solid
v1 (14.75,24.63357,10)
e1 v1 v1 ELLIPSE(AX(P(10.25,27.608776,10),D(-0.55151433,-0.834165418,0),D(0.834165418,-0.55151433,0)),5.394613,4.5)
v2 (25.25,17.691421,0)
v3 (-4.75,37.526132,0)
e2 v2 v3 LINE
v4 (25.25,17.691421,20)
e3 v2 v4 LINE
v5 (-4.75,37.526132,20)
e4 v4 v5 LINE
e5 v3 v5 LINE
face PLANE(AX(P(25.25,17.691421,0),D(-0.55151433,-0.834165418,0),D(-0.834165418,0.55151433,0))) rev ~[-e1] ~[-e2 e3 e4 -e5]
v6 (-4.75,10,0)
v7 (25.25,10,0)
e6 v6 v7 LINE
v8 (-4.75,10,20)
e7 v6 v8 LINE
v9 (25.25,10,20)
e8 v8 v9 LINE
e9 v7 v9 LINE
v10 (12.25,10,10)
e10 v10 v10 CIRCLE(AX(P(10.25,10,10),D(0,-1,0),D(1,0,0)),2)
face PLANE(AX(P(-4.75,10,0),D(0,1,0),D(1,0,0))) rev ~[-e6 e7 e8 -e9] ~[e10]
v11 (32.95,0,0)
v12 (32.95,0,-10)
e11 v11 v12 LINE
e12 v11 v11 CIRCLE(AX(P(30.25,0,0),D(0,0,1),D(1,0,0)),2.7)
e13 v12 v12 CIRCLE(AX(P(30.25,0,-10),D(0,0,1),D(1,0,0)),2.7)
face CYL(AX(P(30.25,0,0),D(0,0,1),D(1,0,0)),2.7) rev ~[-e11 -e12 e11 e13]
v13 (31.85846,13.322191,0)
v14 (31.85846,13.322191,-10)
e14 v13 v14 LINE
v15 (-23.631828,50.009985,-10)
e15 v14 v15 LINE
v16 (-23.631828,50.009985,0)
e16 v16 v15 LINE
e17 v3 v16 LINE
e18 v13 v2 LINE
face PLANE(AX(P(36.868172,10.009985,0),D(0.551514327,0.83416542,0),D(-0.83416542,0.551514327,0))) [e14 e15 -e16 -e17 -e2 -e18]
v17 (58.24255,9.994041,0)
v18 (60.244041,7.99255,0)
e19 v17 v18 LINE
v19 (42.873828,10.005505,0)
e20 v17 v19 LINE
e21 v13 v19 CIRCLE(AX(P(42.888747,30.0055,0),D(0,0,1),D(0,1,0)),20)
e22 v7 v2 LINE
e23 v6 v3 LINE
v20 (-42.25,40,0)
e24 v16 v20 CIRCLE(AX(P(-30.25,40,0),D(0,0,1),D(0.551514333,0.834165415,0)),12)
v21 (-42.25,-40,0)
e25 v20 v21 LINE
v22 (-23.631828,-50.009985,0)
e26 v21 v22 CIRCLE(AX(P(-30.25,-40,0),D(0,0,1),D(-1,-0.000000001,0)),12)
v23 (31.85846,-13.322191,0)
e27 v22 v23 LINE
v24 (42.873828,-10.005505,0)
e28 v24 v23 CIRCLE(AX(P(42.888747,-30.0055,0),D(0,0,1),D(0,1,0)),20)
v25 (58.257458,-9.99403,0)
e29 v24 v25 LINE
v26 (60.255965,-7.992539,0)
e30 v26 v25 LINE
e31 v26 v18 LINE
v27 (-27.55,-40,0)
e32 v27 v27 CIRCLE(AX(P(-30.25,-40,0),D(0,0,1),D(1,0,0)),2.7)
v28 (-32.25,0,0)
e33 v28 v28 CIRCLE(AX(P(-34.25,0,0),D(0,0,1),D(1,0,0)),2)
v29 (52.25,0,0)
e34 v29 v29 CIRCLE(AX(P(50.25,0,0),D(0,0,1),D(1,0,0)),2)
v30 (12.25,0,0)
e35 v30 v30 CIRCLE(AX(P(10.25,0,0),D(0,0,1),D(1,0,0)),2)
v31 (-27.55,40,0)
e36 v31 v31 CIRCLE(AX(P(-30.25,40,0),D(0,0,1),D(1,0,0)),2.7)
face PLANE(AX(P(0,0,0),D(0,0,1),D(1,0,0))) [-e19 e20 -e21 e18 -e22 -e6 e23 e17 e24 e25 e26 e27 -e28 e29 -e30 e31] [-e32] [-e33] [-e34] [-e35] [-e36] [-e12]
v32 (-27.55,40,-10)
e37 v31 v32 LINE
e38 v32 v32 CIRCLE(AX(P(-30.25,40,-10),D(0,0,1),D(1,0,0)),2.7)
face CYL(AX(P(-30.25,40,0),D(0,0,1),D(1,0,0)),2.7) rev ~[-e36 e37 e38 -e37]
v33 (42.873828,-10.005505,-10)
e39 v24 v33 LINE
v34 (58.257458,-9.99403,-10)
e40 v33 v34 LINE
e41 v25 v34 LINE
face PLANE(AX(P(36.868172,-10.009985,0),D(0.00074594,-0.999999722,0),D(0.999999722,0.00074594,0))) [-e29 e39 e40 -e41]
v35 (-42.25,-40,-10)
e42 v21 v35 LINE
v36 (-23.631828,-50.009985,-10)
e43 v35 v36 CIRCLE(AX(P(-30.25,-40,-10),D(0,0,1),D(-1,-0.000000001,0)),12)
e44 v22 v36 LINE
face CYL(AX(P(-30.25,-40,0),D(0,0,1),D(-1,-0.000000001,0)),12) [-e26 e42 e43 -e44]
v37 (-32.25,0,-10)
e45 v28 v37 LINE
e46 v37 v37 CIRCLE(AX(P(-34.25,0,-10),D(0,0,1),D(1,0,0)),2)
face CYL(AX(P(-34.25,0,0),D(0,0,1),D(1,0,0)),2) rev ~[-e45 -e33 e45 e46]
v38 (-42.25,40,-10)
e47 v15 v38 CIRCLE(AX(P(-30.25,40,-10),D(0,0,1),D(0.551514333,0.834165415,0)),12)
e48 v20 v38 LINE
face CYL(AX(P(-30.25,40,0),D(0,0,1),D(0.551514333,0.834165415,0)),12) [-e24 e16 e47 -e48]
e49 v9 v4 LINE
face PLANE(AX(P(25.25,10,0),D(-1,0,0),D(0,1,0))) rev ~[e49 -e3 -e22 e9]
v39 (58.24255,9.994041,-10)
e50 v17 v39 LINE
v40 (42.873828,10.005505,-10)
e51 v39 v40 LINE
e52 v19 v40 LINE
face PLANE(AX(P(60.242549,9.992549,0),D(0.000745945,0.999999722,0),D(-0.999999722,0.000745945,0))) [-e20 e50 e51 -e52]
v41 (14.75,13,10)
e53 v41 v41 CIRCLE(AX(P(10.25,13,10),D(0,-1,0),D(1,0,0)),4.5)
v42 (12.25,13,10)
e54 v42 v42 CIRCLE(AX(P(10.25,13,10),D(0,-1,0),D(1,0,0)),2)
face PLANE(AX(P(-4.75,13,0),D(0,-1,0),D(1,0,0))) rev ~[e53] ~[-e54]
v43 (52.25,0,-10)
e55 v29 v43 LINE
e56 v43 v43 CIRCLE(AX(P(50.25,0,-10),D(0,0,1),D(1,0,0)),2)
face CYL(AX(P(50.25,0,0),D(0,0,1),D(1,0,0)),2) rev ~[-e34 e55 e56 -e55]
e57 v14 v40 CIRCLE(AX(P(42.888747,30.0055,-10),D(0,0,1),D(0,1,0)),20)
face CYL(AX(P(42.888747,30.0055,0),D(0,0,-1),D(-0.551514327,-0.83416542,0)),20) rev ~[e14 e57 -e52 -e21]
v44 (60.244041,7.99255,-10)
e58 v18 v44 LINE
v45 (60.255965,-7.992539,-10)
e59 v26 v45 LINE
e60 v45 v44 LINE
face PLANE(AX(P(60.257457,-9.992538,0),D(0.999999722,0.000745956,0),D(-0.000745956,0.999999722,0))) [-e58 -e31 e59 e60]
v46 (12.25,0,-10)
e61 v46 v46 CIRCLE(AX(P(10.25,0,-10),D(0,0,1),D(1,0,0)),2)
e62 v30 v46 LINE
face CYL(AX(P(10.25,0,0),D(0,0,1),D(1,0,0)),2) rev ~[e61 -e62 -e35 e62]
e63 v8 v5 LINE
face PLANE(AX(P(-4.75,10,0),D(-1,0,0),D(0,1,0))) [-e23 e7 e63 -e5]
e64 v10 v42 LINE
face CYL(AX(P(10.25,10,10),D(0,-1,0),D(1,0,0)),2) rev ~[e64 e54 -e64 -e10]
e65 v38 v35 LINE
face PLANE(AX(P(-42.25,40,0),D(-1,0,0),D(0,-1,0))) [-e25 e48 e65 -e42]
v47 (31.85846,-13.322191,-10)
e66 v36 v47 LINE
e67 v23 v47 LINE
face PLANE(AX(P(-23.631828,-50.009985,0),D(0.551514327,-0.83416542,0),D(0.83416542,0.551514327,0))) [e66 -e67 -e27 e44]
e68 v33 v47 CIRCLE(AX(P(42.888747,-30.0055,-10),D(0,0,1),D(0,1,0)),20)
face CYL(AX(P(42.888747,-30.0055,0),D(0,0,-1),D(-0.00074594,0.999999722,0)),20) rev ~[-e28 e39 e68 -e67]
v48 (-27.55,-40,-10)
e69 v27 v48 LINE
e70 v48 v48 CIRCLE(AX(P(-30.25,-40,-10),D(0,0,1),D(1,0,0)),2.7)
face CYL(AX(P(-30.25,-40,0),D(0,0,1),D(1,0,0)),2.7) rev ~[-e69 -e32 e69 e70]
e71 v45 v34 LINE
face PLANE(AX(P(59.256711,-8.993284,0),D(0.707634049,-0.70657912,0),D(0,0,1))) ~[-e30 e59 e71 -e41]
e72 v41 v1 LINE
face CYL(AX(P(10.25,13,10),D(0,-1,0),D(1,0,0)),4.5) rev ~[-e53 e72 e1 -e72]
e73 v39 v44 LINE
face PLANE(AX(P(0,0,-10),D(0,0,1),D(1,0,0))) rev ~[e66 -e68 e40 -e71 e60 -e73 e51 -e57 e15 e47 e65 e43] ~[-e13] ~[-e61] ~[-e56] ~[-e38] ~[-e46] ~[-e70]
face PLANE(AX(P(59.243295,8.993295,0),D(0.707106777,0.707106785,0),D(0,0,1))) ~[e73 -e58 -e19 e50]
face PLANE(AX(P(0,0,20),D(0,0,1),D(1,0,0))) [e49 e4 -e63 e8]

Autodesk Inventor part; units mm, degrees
ref_plane "YZ Plane" through (0, 0, 0) normal (1, 0, 0) x (0, 1, 0)
ref_plane "XZ Plane" through (0, 0, 0) normal (0, 1, 0) x (-1, 0, 0)
ref_plane "XY Plane" through (0, 0, 0) normal (0, 0, 1) x (1, 0, 0)
sketch "Sketch1" plane through (0, 0, 0) normal (0, 0, 1) x (1, 0, 0)
  line L0 (0, 0) -> (30.25, 0) construction
  line L1 (0, 0) -> (-30.25, 0) construction
  line L2 (-30.25, 0) -> (-30.25, 40) construction
  line L3 (-30.25, 0) -> (-30.25, -40) construction
  circle A0 centre (-30.25, 40) radius 2.7
  circle A1 centre (-30.25, -40) radius 2.7
  circle A2 centre (30.25, 0) radius 2.7
  circle A3 centre (-30.25, 40) radius 12
  circle A4 centre (-30.25, -40) radius 12
  circle A5 centre (30.25, 0) radius 12
  line L4 (36.868172, -10.009985) -> (-23.631828, -50.009985)
  line L5 (-42.25, 40) -> (-42.25, -40)
  circle A6 centre (-34.25, 0) radius 2
  line L6 (-30.25, 0) -> (-34.25, 0) construction
  line L7 (-23.631828, 50.009985) -> (36.868172, 10.009985)
  line L8 (30.25, 0) -> (50.25, 0) construction
  circle A7 centre (50.25, 0) radius 10
  circle A8 centre (50.25, 0) radius 2
  line L9 (50.25746, 9.999997) -> (36.868172, 10.009985)
  line L10 (50.25746, -9.999997) -> (36.868172, -10.009985)
  circle A9 centre (10.25, 0) radius 2
  line L11 (50.25746, -9.999997) -> (60.257457, -9.992538)
  line L12 (60.257457, -9.992538) -> (60.242549, 9.992549)
  line L13 (60.242549, 9.992549) -> (50.25746, 9.999997)
  point P0 (-42.25, 0)
  point P1 (41.35, -4.559605)
  point P2 (41.35, 4.559605)
  point P3 (60.249997, 0.00746)
  dimension "d0" = 60.5
  dimension "d1" = 5.4
  dimension "d2" = 80
  dimension "d3" = 24
  dimension "d55" = 4
  dimension "d56" = 8
  dimension "d57" = 20
  dimension "d58" = 20
  dimension "d69" = 20
sketch "Sketch1 outline for Extrusion1" plane through (0, 0, 0) normal (0, 0, 1) x (1, 0, 0)
  arc A0 (-23.631828, 50.009985) -> (-42.25, 40) centre (-30.25, 40) ccw
  line L0 (-42.25, 40) -> (-42.25, -40)
  arc A1 (-42.25, -40) -> (-23.631828, -50.009985) centre (-30.25, -40) ccw
  line L1 (-23.631828, -50.009985) -> (36.868172, -10.009985)
  line L2 (36.868172, -10.009985) -> (60.257457, -9.992538)
  line L3 (60.257457, -9.992538) -> (60.242549, 9.992549)
  line L4 (60.242549, 9.992549) -> (36.868172, 10.009985)
  line L5 (36.868172, 10.009985) -> (-23.631828, 50.009985)
  circle A2 centre (-30.25, 40) radius 2.7
  circle A3 centre (10.25, 0) radius 2
  circle A4 centre (-34.25, 0) radius 2
  circle A5 centre (30.25, 0) radius 2.7
  circle A6 centre (-30.25, -40) radius 2.7
  circle A7 centre (50.25, 0) radius 2
extrude "Extrusion1" add sketch "Sketch1 outline for Extrusion1" against normal blind 10
fillet "Fillet1" radius 20 2 edges at (36.8682, 10.01, -5) (36.8682, -10.01, -5)
sketch "Sketch5" plane through (0, 0, 0) normal (0, 0, 1) x (1, 0, 0)
  arc A0 (-42.25, -40) -> (-23.631828, -50.009985) centre (-30.25, -40) ccw
  line L0 (-23.631828, -50.009985) -> (31.85846, -13.322191)
  arc A1 (42.873828, -10.005505) -> (31.85846, -13.322191) centre (42.888747, -30.0055) ccw
  line L1 (42.873828, -10.005505) -> (60.257457, -9.992538)
  arc A2 (31.85846, 13.322191) -> (42.873828, 10.005505) centre (42.888747, 30.0055) ccw
  line L2 (31.85846, 13.322191) -> (-23.631828, 50.009985)
  arc A3 (-23.631828, 50.009985) -> (-42.25, 40) centre (-30.25, 40) ccw
  line L3 (-42.25, 40) -> (-42.25, -40)
  circle A4 centre (-30.25, -40) radius 2.7
  circle A5 centre (30.25, 0) radius 2.7
  circle A6 centre (-34.25, 0) radius 2
  circle A7 centre (-30.25, 40) radius 2.7
  circle A8 centre (50.25, 0) radius 2
  line L4 (-4.75, 10) -> (-4.75, 37.526132)
  line L5 (-4.75, 10) -> (25.25, 10)
  line L6 (25.25, 10) -> (25.25, 17.691421)
  line L7 (60.257457, -9.992538) -> (60.242549, 9.992549)
  line L8 (60.242549, 9.992549) -> (42.873828, 10.005505)
  point P0 (10.267224, 24.242705)
  point P1 (8.658764, 37.564896)
  dimension "d64" = 10
  dimension "d65" = 5
  dimension "d66" = 30
extrude "Extrusion6" add sketch "Sketch5" along normal blind 20 contours L2 L6 L5 L4
sketch "Sketch6" plane through (-4.75, 10, 0) normal (0, -1, 0) x (1, 0, 0)
  line L0 (30, 0) -> (30, 20) projected
  line L1 (0, 20) -> (30, 20) projected
  line L2 (0, 0) -> (0, 20) projected
  line L3 (13, 0) -> (17, 0) projected
  line L4 (15, 0) -> (15, 10) construction
  circle A0 centre (15, 10) radius 2
  point P0 (4.75, 0)
  dimension "d70" = 10
  dimension "d71" = 4
ref_plane "Work Plane1" through (-4.75, 13, 0) normal (0, -1, 0) x (1, 0, 0)
extrude "Extrusion7" cut sketch "Sketch6" against normal through all
sketch "Sketch7" plane through (-4.75, 13, 0) normal (0, -1, 0) x (1, 0, 0)
  circle A0 centre (15, 10) radius 2 projected
  circle A1 centre (15, 10) radius 4.5
  point P0 (4.75, 0)
  dimension "d75" = 9
extrude "Extrusion8" cut sketch "Sketch7" against normal through all
chamfer "Chamfer6" distance 2 angle 45 2 edges at (60.2425, 9.9925, -5) (60.2575, -9.9925, -5)
equation "\"b\" = 2"
properties part number "y axis something back_3DPrint"
